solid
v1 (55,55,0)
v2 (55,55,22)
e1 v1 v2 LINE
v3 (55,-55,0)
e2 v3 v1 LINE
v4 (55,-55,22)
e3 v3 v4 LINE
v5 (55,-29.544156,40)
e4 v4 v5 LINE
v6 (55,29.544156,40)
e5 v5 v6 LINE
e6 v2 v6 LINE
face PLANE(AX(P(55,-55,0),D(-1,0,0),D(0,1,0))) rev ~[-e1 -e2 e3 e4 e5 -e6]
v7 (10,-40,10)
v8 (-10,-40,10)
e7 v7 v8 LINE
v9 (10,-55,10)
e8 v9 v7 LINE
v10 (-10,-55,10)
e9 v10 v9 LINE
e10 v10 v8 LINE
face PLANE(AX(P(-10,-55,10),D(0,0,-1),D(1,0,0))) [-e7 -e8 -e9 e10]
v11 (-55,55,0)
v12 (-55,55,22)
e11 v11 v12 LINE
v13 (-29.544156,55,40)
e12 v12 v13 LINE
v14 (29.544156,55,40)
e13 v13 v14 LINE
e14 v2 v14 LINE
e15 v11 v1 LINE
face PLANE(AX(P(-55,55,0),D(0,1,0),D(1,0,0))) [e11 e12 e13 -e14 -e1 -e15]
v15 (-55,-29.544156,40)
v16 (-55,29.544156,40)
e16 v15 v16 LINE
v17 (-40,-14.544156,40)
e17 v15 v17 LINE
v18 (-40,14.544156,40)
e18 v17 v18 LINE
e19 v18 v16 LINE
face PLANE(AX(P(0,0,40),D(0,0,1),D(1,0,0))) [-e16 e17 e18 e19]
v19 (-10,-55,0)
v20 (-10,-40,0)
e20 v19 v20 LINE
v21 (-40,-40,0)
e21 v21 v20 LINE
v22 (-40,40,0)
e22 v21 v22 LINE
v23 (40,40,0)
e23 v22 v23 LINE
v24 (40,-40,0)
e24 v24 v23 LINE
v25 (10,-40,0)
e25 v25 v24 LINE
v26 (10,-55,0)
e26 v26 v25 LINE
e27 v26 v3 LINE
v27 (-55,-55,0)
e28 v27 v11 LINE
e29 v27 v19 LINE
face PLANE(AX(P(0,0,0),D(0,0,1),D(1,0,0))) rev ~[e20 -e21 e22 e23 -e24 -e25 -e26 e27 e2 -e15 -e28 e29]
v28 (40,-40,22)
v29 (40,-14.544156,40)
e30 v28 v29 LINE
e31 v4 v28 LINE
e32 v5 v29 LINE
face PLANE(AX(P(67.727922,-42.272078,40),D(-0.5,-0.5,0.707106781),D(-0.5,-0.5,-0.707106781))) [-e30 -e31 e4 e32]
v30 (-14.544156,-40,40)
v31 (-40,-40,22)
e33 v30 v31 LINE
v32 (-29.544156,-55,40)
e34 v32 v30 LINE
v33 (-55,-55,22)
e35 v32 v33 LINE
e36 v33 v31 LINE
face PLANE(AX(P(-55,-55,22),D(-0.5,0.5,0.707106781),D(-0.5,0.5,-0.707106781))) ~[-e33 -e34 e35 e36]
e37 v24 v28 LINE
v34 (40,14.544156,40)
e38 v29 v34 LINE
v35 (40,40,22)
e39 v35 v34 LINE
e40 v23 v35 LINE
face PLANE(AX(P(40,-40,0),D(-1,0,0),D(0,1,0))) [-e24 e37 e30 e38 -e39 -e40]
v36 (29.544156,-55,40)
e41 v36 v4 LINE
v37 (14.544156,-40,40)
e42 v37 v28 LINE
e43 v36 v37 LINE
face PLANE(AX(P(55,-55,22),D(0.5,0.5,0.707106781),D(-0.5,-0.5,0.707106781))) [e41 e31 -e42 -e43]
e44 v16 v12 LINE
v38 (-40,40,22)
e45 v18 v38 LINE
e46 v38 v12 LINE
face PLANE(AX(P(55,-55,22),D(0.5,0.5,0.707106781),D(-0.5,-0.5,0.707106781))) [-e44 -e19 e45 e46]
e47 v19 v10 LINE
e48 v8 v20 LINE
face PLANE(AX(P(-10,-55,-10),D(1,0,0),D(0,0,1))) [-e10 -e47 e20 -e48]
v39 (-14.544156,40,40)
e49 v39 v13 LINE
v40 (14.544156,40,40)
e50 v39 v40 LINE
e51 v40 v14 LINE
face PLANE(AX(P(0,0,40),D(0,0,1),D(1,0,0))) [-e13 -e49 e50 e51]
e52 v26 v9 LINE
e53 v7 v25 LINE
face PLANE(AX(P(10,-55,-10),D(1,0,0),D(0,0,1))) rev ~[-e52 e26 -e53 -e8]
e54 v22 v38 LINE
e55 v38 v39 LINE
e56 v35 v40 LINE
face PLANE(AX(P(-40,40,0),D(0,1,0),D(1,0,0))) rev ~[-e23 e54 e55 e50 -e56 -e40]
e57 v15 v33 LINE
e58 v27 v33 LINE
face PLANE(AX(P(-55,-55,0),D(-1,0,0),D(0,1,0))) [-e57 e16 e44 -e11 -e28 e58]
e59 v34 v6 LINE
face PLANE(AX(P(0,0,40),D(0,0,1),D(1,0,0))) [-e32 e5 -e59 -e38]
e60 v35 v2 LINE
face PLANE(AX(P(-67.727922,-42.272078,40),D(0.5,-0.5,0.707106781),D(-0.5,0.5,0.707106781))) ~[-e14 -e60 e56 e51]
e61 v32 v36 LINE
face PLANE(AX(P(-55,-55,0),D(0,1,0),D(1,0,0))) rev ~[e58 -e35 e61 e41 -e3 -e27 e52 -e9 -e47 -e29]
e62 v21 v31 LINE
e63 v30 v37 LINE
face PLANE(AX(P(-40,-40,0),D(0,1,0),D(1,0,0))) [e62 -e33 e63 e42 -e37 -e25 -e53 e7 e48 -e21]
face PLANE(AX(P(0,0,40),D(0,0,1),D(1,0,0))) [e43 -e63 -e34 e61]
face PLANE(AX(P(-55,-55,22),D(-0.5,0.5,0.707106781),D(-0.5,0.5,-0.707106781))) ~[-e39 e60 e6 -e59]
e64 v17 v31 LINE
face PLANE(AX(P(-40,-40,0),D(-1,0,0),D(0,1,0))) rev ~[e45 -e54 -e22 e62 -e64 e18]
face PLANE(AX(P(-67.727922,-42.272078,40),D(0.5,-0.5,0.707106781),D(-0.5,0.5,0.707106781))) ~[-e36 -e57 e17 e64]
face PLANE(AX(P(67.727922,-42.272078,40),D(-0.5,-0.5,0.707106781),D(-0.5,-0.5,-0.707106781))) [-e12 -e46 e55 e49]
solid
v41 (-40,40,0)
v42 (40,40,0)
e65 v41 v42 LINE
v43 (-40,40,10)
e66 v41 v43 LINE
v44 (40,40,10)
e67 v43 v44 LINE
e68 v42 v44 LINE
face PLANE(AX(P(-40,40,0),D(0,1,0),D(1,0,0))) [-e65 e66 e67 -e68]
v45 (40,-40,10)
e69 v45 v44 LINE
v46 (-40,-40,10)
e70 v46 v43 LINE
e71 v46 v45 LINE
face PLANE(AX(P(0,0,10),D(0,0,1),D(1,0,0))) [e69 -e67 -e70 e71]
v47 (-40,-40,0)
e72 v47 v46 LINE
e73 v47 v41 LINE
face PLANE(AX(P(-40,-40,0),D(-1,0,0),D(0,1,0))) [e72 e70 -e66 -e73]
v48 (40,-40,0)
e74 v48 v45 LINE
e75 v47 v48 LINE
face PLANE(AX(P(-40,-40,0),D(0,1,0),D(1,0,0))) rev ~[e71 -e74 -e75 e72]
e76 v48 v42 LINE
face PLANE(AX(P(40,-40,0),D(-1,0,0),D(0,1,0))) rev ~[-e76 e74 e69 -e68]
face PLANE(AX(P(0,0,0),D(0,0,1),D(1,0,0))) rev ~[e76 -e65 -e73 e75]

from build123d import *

# Parameters (mm, degrees)
F0_W     = 110
F0_H     = 110
F0_W_2   = 80
F0_H_2   = 80
F1_DEPTH = 40
F0_W_3   = 70
F0_H_3   = 70
F2_DEPTH = 10
F5_DEPTH = 200
F6_W     = 20
F6_H     = 20
F7_DEPTH = 25


# Not quite as in the source:
# - a pattern or mirror of a feature is missing from the dataset's text; its kind, count and spacing are read off the source's solid


with BuildPart() as f1:
    # F0 (on Top) → F1 (new body)
    with BuildSketch(Plane.XY):
        Rectangle(F0_W, F0_H)
        Rectangle(F0_W_2, F0_H_2, mode=Mode.SUBTRACT)
    extrude(amount=F1_DEPTH)

    # F4 (on face) → F5 (cut)
    with BuildSketch(Plane(origin=(55, -55, 0), x_dir=(-0.7071067812, -0.7071067812, 0), z_dir=(-0.7071067812, 0.7071067812, 0))):
        Polygon((-18, 40), (0, 22), (0, 40), align=None)
        Polygon((0, 40), (0, 22), (18, 40), align=None)
    f5 = extrude(amount=F5_DEPTH, mode=Mode.SUBTRACT)

    # F5_copies: F5 across plane
    add(f5.mirror(Plane(origin=(0, 0, 0), x_dir=(0, 0, 1), z_dir=(1, 0, 0))), mode=Mode.SUBTRACT)

    # F6 (on face) → F7 (cut)
    with BuildSketch(Plane.XZ.offset(55)):
        Rectangle(F6_W, F6_H)
    extrude(amount=-F7_DEPTH, mode=Mode.SUBTRACT)


with BuildPart() as f2:
    # F0 (on Top) → F2 (new body)
    with BuildSketch(Plane.XY):
        Rectangle(F0_W_2, F0_H_2)
        Rectangle(F0_W_3, F0_H_3, mode=Mode.SUBTRACT)
        Rectangle(F0_W_3, F0_H_3)
    extrude(amount=F2_DEPTH)


solid = Compound([f1.part, f2.part])
